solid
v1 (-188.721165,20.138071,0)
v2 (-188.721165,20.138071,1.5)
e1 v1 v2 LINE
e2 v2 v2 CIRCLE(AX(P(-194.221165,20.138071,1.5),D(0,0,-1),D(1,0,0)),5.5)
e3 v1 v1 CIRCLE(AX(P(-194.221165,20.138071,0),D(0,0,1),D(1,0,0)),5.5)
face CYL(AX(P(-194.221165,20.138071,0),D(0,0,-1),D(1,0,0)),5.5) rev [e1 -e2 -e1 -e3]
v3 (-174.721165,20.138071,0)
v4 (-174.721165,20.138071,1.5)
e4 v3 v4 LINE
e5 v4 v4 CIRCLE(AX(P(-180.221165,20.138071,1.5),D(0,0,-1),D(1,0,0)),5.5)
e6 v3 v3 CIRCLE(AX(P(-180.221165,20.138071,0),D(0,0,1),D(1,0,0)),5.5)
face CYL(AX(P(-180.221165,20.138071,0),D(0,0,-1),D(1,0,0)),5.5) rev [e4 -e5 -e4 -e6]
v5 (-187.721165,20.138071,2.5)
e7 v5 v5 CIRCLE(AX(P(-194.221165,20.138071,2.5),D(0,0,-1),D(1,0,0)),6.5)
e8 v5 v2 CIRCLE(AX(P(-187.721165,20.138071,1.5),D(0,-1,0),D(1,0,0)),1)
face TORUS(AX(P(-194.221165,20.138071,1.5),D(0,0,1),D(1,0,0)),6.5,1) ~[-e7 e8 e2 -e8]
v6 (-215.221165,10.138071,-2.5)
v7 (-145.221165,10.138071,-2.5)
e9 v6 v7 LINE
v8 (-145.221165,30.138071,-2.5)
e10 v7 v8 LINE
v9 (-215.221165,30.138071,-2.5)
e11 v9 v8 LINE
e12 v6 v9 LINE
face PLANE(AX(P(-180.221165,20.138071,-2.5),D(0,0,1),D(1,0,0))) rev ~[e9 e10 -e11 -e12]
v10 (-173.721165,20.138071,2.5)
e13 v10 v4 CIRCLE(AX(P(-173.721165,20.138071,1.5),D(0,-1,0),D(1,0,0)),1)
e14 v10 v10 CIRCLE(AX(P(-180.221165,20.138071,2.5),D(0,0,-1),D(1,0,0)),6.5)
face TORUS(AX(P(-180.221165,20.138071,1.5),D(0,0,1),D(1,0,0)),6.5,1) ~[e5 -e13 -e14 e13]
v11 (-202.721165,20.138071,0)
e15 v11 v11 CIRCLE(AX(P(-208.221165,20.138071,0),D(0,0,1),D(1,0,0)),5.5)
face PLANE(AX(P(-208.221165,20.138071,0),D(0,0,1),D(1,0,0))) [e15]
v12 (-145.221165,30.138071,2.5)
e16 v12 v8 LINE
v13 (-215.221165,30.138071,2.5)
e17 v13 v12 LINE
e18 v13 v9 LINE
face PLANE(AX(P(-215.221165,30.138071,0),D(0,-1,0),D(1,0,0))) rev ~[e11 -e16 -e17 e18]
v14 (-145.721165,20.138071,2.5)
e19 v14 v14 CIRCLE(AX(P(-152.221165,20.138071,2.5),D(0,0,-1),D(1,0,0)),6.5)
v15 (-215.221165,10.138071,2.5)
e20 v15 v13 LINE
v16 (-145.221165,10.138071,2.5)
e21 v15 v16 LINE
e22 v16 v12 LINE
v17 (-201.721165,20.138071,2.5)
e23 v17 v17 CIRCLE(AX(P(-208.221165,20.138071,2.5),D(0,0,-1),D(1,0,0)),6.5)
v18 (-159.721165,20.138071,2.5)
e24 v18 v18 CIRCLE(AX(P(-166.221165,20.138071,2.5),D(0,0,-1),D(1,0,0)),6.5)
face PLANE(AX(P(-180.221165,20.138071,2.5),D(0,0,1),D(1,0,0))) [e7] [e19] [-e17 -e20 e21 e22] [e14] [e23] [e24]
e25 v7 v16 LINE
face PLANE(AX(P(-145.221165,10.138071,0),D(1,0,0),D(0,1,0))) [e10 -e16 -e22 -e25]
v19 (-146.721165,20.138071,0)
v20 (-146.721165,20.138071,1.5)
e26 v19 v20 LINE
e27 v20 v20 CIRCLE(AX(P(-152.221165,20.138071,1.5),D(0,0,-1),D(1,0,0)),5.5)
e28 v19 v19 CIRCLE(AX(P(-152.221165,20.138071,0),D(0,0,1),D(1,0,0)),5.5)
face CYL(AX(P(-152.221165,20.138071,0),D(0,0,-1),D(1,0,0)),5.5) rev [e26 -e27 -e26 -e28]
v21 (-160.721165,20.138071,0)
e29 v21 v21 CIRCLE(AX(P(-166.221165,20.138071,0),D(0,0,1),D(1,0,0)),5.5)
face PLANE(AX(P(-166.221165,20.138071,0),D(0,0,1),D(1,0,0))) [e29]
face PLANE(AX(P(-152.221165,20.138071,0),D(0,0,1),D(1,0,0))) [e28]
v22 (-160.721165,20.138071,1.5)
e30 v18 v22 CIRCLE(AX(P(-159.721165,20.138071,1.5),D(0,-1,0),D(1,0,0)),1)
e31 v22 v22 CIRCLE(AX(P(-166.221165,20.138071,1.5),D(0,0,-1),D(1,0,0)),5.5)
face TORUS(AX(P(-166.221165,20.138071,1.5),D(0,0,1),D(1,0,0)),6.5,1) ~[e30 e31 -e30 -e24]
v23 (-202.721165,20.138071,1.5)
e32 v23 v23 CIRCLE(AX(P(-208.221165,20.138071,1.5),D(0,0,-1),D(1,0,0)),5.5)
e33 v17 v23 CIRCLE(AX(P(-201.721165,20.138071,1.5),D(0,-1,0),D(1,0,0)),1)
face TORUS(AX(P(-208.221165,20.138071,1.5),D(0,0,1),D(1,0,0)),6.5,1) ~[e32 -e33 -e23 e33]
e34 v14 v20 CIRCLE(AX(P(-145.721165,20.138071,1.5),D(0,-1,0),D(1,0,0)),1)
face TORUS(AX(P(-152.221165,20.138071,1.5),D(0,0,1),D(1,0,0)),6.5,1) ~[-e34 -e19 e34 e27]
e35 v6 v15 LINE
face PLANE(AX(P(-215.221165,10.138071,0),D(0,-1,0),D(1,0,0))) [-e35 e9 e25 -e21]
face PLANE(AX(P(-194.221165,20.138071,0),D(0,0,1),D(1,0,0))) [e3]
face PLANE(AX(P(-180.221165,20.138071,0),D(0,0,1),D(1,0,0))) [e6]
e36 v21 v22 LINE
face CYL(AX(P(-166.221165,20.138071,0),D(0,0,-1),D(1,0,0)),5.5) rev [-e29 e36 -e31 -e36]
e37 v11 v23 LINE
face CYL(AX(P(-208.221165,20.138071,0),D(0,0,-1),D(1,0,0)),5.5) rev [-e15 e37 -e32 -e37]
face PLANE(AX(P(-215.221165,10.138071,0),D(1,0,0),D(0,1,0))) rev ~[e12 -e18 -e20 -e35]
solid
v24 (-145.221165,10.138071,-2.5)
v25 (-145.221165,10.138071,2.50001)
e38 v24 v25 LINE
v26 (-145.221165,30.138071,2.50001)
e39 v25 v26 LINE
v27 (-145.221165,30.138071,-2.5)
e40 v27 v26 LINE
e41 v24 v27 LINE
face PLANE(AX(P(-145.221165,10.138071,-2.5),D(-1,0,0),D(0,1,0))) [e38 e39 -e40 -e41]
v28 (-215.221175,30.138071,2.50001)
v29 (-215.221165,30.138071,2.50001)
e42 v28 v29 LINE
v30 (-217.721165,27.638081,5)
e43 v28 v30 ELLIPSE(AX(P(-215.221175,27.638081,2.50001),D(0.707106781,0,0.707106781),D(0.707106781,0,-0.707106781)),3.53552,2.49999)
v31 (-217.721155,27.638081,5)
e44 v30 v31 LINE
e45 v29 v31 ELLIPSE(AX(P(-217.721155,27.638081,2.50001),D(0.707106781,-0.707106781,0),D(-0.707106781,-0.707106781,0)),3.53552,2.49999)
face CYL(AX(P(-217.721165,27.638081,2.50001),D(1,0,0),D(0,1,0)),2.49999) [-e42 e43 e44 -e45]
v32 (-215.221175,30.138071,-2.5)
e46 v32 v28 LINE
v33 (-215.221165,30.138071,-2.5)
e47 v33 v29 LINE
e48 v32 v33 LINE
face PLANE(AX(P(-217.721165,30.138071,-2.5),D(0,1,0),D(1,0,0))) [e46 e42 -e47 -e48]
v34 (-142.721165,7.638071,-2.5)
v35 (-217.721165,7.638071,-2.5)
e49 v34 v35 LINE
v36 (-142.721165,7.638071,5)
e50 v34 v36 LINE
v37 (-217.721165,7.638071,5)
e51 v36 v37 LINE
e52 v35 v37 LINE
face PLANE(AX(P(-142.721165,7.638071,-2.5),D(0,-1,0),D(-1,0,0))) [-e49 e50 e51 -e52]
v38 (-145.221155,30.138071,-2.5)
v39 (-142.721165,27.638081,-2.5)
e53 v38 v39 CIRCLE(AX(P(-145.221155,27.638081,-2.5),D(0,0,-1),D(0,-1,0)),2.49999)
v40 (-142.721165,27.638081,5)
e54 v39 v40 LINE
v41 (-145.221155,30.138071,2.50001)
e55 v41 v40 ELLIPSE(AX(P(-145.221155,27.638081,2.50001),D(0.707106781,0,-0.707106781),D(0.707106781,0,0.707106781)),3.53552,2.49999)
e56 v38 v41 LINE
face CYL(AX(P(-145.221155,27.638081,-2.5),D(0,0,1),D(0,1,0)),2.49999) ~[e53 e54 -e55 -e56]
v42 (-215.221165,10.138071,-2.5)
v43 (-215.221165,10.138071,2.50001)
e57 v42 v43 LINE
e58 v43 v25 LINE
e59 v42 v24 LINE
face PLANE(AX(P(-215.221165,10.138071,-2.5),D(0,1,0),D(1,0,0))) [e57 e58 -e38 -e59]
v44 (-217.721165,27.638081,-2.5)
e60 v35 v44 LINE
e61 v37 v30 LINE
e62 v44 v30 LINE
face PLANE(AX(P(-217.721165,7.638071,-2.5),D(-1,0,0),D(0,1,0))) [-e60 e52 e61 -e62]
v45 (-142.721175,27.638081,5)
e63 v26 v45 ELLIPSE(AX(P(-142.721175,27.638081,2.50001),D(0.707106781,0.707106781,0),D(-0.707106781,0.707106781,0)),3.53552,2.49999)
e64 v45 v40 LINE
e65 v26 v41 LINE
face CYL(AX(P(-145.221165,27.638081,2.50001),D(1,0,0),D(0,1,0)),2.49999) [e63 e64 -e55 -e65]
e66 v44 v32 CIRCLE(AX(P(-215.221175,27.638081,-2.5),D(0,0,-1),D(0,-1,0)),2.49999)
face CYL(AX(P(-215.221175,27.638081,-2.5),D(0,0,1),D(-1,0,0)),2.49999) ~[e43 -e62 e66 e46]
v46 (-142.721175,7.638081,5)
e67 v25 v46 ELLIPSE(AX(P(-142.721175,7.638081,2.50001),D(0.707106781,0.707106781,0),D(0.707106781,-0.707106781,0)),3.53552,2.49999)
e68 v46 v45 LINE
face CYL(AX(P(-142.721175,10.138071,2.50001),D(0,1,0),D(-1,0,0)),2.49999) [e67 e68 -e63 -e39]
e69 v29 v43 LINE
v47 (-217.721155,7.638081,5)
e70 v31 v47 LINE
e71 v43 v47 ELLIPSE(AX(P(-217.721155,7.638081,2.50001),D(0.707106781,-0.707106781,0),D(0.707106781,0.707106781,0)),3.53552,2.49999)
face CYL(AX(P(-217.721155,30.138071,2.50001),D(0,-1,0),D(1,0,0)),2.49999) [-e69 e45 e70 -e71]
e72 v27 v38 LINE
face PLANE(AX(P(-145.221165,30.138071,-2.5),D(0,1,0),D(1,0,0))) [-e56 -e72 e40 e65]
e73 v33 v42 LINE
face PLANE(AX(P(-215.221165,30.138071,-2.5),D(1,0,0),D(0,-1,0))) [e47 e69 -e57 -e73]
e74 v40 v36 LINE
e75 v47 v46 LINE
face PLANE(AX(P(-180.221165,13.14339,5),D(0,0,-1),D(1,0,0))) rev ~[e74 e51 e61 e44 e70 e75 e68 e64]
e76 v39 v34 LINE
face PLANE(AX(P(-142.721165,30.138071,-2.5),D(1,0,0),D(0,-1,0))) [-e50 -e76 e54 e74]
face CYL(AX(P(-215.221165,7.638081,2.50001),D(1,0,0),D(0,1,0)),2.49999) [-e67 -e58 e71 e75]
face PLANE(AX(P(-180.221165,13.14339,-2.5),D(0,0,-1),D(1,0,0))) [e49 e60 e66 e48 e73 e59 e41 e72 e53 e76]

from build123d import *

# Parameters (mm, degrees)
F1_W          = 70
F1_H          = 20
F2_DEPTH      = 2.5
F2_DEPTH_BACK = 2.5
F0_R          = 5.5
F3_DEPTH      = 25.4
F5_DEPTH      = 7.5
F6_R          = 2.49999
F7_R          = 1


# Not quite as in the source:
# - a fillet or chamfer is up to 0.001 mm smaller than in the source, because OpenCascade refuses the exact size


with BuildPart() as f2:
    # F1 (on face) → F2 (new body, two sides)
    with BuildSketch(Plane.XY) as f2_sk:
        with Locations((-180.2211654186, 20.1380707997)):
            Rectangle(F1_W, F1_H)
    extrude(amount=F2_DEPTH)
    extrude(f2_sk.sketch, amount=-F2_DEPTH_BACK)

    # F0 (on Top) → F3 (cut)
    with BuildSketch(Plane.XY):
        with Locations((-152.2211654186, 20.1380707997)):
            Circle(F0_R)
        with Locations((-166.2211654186, 20.1380707997)):
            Circle(F0_R)
        with Locations((-180.2211654186, 20.1380707997)):
            Circle(F0_R)
        with Locations((-194.2211654186, 20.1380707997)):
            Circle(F0_R)
        with Locations((-208.2211654186, 20.1380707997)):
            Circle(F0_R)
    extrude(amount=F3_DEPTH, mode=Mode.SUBTRACT)

    # F7
    f7_edges = [f2.edges().sort_by_distance(p)[0] for p in [
        (-157.721165, 20.138071, 2.5),
        (-171.721165, 20.138071, 2.5),
        (-185.721165, 20.138071, 2.5),
        (-199.721165, 20.138071, 2.5),
        (-213.721165, 20.138071, 2.5),
    ]]
    fillet(f7_edges, radius=F7_R)


with BuildPart() as f5:
    # F4 (on face) → F5 (new body)
    with BuildSketch(Plane(origin=(0, 0, -2.5), x_dir=(1, 0, 0), z_dir=(0, 0, -1))):
        Polygon((-145.2211654186, -30.1380707997), (-142.7211654186, -30.1380707997), (-142.7211654186, -7.6380707997), (-217.7211654186, -7.6380707997), (-217.7211654186, -30.1380707997), (-215.2211654186, -30.1380707997), (-215.2211654186, -10.1380707997), (-145.2211654186, -10.1380707997), align=None)
    extrude(amount=-F5_DEPTH)

    # F6 (radius 2.5 in the source; OpenCascade refuses exactly that, so slightly less here)
    f6_edges = [f5.edges().sort_by_distance(p)[0] for p in [
        (-180.221165, 10.138071, 5),
        (-145.221165, 20.138071, 5),
        (-215.221165, 20.138071, 5),
        (-216.471165, 30.138071, 5),
        (-143.971165, 30.138071, 5),
        (-142.721165, 30.138071, 1.25),
        (-217.721165, 30.138071, 1.25),
    ]]
    fillet(f6_edges, radius=F6_R)


solid = Compound([f2.part, f5.part])
